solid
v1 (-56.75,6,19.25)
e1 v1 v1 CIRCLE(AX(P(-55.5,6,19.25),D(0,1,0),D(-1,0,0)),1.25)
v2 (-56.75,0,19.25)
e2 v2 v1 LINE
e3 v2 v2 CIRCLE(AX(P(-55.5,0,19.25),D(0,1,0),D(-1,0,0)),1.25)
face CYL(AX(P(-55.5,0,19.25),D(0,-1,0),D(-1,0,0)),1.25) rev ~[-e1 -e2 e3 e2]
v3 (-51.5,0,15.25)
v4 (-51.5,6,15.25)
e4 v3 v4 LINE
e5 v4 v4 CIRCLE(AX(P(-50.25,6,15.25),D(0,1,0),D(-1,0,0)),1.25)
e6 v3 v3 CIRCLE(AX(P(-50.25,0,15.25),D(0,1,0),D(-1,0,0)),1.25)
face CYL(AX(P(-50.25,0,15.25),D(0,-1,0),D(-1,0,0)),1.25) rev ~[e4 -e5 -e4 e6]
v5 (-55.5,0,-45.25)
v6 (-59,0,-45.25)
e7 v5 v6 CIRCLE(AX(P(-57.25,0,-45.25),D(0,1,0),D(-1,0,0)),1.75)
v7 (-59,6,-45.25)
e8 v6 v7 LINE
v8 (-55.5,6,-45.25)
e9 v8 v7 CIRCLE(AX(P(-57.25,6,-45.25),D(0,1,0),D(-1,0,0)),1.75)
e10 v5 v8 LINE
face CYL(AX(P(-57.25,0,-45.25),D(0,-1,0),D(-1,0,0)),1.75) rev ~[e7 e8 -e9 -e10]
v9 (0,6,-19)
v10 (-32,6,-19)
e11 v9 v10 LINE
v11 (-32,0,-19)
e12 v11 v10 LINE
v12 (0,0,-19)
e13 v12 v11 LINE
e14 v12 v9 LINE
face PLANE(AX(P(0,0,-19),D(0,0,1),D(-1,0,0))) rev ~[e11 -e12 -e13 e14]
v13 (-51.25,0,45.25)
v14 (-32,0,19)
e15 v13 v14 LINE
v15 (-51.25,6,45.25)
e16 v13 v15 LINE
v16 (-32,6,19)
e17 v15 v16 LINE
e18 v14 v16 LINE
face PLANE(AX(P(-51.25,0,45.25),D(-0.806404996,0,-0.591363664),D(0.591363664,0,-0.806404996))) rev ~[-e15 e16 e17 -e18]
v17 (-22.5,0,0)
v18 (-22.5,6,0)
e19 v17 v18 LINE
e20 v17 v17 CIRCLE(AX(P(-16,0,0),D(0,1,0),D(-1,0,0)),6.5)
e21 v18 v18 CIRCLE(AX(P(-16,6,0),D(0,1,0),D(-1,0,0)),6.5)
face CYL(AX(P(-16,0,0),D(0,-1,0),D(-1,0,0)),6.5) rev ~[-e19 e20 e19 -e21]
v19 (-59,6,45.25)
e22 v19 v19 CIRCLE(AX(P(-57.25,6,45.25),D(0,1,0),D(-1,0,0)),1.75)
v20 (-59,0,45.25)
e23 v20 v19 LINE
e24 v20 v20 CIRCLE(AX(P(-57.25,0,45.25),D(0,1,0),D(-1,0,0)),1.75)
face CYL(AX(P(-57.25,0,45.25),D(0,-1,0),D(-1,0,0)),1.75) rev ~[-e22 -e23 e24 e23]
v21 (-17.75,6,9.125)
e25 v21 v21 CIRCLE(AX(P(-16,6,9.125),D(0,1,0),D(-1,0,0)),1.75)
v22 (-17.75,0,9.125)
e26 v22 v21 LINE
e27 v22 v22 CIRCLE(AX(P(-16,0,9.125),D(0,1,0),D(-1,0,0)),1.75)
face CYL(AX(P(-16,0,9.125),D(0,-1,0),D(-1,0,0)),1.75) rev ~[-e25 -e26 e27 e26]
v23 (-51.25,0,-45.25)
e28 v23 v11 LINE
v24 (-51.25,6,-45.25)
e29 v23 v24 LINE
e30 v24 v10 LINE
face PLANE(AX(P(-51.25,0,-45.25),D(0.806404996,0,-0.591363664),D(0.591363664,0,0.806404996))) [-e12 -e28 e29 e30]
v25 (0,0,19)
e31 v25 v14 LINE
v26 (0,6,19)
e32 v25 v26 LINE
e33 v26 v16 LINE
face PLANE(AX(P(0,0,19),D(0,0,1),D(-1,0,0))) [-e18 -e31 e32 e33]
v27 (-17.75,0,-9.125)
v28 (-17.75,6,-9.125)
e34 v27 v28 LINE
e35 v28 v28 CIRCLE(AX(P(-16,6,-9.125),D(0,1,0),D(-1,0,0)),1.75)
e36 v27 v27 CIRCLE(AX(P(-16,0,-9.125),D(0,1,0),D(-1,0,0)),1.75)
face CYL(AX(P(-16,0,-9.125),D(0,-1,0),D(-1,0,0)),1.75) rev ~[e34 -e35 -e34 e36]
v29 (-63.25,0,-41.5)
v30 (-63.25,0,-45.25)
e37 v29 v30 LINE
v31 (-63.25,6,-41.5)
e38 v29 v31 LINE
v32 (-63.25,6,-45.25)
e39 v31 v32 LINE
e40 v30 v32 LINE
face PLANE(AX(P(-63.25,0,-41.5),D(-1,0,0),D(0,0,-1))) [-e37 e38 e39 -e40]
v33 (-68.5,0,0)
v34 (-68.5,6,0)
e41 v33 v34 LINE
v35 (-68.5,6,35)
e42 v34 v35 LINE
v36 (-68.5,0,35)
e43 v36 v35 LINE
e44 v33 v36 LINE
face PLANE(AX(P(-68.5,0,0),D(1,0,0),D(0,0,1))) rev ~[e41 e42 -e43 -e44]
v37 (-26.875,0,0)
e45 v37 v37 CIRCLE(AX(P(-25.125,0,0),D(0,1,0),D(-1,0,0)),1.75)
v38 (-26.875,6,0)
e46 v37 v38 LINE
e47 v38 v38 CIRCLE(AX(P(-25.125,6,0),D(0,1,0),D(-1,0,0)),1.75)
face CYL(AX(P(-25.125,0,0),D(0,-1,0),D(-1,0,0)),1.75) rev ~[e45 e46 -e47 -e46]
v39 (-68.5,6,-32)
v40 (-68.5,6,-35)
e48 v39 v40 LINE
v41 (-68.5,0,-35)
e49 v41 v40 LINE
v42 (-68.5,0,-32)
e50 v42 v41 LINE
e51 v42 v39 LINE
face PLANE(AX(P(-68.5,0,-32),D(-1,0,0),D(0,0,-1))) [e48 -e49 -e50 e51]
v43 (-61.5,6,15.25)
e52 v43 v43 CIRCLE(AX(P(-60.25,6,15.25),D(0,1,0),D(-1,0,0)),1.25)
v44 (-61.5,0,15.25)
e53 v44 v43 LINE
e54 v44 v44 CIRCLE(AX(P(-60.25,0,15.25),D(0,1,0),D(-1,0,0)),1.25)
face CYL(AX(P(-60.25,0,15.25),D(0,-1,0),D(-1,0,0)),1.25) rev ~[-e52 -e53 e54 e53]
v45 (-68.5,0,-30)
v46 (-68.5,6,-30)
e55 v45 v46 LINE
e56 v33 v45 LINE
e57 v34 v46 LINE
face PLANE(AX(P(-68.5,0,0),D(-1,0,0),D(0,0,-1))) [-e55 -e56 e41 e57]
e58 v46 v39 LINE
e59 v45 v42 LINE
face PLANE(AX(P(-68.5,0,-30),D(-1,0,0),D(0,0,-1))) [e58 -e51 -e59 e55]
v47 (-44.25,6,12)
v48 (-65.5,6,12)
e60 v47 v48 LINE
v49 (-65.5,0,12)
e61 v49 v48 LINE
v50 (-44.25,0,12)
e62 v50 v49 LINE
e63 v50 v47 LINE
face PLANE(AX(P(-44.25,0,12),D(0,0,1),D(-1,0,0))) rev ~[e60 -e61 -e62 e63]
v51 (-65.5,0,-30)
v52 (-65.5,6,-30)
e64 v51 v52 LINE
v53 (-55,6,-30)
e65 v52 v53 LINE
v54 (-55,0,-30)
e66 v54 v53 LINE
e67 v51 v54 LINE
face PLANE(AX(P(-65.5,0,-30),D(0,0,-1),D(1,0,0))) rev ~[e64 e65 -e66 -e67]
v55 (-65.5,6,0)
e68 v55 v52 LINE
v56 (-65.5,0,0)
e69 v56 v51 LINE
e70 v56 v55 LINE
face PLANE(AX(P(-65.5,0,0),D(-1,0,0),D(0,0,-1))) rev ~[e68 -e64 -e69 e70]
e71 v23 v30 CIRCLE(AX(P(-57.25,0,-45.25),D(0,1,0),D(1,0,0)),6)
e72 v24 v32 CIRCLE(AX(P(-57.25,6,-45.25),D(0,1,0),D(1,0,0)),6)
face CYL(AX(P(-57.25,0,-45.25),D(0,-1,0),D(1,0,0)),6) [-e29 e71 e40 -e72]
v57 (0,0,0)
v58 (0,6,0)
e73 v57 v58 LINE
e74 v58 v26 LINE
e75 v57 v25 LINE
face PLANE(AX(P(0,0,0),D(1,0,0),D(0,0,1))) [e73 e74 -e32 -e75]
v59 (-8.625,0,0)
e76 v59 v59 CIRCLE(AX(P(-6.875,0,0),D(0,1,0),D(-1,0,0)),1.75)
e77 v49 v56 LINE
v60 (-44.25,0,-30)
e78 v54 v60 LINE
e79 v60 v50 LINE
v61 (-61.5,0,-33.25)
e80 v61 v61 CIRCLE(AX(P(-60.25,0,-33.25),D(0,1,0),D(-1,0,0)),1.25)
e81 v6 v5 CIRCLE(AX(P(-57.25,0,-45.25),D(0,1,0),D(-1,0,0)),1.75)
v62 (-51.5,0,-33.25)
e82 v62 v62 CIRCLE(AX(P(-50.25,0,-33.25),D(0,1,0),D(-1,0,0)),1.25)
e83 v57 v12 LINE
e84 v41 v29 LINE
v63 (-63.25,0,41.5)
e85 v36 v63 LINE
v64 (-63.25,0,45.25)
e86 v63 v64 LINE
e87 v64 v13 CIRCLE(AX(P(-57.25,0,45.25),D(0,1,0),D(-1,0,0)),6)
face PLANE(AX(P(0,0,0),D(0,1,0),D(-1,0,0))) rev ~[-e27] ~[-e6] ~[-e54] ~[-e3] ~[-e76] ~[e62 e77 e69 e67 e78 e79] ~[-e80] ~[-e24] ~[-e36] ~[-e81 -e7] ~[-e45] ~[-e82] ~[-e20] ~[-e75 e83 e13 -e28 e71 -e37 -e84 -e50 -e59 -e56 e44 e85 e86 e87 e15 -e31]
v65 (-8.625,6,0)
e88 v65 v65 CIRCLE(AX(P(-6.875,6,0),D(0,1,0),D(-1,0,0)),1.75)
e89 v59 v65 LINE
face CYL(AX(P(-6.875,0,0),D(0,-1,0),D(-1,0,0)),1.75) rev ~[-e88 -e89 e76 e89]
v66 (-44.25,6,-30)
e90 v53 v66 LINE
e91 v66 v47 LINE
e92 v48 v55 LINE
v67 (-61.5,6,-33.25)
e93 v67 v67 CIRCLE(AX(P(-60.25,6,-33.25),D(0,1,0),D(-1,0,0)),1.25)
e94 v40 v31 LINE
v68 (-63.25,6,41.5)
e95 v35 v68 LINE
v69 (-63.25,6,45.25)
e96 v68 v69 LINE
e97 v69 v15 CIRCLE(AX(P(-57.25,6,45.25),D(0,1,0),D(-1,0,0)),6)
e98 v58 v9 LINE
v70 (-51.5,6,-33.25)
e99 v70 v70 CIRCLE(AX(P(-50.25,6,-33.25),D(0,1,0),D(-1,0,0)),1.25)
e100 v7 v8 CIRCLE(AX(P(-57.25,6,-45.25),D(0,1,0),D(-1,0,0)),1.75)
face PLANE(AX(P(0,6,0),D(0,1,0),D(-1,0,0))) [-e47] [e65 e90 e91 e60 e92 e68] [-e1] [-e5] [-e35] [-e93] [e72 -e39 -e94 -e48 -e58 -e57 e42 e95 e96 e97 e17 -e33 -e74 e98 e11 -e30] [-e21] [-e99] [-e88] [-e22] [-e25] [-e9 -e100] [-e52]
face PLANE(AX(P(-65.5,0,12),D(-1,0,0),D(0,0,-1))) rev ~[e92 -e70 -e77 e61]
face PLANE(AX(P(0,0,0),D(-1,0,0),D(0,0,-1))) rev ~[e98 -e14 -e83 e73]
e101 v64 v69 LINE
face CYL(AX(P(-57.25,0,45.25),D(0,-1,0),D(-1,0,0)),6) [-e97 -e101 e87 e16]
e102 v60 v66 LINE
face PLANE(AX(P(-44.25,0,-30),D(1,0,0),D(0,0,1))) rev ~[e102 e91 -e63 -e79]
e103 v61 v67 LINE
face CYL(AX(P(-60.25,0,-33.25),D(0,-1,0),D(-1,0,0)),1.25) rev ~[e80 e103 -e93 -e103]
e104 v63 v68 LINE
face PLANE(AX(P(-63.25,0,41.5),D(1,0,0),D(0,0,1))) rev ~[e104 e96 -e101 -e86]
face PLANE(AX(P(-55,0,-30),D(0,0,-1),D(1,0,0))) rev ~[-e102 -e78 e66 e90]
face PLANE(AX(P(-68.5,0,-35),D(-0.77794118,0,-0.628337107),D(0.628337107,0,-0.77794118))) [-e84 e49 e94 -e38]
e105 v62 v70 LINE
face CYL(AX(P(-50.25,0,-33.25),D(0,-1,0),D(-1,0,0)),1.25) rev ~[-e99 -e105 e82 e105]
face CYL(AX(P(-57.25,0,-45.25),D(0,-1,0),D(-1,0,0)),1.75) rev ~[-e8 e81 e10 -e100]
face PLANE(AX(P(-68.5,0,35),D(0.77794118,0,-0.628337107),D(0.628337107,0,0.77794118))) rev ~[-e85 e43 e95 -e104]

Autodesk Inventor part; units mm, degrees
ref_plane "YZ Plane" through (0, 0, 0) normal (1, 0, 0) x (0, 1, 0)
ref_plane "XZ Plane" through (0, 0, 0) normal (0, 1, 0) x (-1, 0, 0)
ref_plane "XY Plane" through (0, 0, 0) normal (0, 0, 1) x (1, 0, 0)
sketch "Sketch1" plane through (0, 0, 0) normal (0, 1, 0) x (-1, 0, 0)
  line L0 (0, 0) -> (0, -19)
  line L1 (0, 0) -> (0, 19)
  line L2 (0, 0) -> (19, 0) construction
  line L3 (0, 19) -> (32, 19)
  line L4 (0, -19) -> (32, -19)
  line L5 (68.5, 0) -> (68.5, -35)
  line L6 (68.5, 0) -> (68.5, 35)
  circle A0 centre (16, 0) radius 6.5
  circle A1 centre (25.125, 0) radius 1.75
  line L7 (55, -30) -> (44.25, -30)
  line L8 (44.25, -30) -> (44.25, 12)
  line L9 (44.25, 12) -> (65.5, 12)
  line L10 (65.5, 12) -> (65.5, 0)
  line L11 (65.5, 0) -> (65.5, -30)
  line L12 (65.5, -30) -> (55, -30)
  line L13 (68.5, -30) -> (68.5, -32)
  circle A2 centre (60.25, -33.25) radius 1.25
  circle A3 centre (50.25, -33.25) radius 1.25
  circle A4 centre (60.25, 15.25) radius 1.25
  circle A5 centre (50.25, 15.25) radius 1.25
  circle A6 centre (16, 9.125) radius 1.75
  circle A7 centre (6.875, 0) radius 1.75
  circle A8 centre (16, -9.125) radius 1.75
  line L14 (68.5, 0) -> (65.5, 0)
  circle A9 centre (57.25, -45.25) radius 1.75
  line L15 (55.5, -45.25) -> (49.3011, -45.25)
  arc A10 (51.25, -45.25) -> (63.25, -45.25) centre (57.25, -45.25) ccw
  line L16 (51.25, -45.25) -> (32, -19)
  line L17 (63.25, -41.5) -> (63.25, -45.25)
  line L18 (68.5, -35) -> (63.25, -41.5)
  circle A11 centre (57.25, 45.25) radius 1.75
  arc A12 (63.25, 45.25) -> (51.25, 45.25) centre (57.25, 45.25) ccw
  line L19 (51.25, 45.25) -> (32, 19)
  line L20 (63.25, 41.5) -> (63.25, 45.25)
  line L21 (68.5, 35) -> (63.25, 41.5)
  circle A13 centre (55.5, 19.25) radius 1.25
  dimension "d0" = 19
  dimension "d1" = 19
  dimension "d2" = 90
  dimension "d3" = 32
  dimension "d4" = 68.5
  dimension "d5" = 35
  dimension "d8" = 13
  dimension "d10" = 3.5
  dimension "d18" = 10.75
  dimension "d22" = 2.5
  dimension "d30" = 360
  dimension "d35" = 12
extrude "Extrusion1" add sketch "Sketch1" along normal blind 6
properties part number "Claw_Main"
